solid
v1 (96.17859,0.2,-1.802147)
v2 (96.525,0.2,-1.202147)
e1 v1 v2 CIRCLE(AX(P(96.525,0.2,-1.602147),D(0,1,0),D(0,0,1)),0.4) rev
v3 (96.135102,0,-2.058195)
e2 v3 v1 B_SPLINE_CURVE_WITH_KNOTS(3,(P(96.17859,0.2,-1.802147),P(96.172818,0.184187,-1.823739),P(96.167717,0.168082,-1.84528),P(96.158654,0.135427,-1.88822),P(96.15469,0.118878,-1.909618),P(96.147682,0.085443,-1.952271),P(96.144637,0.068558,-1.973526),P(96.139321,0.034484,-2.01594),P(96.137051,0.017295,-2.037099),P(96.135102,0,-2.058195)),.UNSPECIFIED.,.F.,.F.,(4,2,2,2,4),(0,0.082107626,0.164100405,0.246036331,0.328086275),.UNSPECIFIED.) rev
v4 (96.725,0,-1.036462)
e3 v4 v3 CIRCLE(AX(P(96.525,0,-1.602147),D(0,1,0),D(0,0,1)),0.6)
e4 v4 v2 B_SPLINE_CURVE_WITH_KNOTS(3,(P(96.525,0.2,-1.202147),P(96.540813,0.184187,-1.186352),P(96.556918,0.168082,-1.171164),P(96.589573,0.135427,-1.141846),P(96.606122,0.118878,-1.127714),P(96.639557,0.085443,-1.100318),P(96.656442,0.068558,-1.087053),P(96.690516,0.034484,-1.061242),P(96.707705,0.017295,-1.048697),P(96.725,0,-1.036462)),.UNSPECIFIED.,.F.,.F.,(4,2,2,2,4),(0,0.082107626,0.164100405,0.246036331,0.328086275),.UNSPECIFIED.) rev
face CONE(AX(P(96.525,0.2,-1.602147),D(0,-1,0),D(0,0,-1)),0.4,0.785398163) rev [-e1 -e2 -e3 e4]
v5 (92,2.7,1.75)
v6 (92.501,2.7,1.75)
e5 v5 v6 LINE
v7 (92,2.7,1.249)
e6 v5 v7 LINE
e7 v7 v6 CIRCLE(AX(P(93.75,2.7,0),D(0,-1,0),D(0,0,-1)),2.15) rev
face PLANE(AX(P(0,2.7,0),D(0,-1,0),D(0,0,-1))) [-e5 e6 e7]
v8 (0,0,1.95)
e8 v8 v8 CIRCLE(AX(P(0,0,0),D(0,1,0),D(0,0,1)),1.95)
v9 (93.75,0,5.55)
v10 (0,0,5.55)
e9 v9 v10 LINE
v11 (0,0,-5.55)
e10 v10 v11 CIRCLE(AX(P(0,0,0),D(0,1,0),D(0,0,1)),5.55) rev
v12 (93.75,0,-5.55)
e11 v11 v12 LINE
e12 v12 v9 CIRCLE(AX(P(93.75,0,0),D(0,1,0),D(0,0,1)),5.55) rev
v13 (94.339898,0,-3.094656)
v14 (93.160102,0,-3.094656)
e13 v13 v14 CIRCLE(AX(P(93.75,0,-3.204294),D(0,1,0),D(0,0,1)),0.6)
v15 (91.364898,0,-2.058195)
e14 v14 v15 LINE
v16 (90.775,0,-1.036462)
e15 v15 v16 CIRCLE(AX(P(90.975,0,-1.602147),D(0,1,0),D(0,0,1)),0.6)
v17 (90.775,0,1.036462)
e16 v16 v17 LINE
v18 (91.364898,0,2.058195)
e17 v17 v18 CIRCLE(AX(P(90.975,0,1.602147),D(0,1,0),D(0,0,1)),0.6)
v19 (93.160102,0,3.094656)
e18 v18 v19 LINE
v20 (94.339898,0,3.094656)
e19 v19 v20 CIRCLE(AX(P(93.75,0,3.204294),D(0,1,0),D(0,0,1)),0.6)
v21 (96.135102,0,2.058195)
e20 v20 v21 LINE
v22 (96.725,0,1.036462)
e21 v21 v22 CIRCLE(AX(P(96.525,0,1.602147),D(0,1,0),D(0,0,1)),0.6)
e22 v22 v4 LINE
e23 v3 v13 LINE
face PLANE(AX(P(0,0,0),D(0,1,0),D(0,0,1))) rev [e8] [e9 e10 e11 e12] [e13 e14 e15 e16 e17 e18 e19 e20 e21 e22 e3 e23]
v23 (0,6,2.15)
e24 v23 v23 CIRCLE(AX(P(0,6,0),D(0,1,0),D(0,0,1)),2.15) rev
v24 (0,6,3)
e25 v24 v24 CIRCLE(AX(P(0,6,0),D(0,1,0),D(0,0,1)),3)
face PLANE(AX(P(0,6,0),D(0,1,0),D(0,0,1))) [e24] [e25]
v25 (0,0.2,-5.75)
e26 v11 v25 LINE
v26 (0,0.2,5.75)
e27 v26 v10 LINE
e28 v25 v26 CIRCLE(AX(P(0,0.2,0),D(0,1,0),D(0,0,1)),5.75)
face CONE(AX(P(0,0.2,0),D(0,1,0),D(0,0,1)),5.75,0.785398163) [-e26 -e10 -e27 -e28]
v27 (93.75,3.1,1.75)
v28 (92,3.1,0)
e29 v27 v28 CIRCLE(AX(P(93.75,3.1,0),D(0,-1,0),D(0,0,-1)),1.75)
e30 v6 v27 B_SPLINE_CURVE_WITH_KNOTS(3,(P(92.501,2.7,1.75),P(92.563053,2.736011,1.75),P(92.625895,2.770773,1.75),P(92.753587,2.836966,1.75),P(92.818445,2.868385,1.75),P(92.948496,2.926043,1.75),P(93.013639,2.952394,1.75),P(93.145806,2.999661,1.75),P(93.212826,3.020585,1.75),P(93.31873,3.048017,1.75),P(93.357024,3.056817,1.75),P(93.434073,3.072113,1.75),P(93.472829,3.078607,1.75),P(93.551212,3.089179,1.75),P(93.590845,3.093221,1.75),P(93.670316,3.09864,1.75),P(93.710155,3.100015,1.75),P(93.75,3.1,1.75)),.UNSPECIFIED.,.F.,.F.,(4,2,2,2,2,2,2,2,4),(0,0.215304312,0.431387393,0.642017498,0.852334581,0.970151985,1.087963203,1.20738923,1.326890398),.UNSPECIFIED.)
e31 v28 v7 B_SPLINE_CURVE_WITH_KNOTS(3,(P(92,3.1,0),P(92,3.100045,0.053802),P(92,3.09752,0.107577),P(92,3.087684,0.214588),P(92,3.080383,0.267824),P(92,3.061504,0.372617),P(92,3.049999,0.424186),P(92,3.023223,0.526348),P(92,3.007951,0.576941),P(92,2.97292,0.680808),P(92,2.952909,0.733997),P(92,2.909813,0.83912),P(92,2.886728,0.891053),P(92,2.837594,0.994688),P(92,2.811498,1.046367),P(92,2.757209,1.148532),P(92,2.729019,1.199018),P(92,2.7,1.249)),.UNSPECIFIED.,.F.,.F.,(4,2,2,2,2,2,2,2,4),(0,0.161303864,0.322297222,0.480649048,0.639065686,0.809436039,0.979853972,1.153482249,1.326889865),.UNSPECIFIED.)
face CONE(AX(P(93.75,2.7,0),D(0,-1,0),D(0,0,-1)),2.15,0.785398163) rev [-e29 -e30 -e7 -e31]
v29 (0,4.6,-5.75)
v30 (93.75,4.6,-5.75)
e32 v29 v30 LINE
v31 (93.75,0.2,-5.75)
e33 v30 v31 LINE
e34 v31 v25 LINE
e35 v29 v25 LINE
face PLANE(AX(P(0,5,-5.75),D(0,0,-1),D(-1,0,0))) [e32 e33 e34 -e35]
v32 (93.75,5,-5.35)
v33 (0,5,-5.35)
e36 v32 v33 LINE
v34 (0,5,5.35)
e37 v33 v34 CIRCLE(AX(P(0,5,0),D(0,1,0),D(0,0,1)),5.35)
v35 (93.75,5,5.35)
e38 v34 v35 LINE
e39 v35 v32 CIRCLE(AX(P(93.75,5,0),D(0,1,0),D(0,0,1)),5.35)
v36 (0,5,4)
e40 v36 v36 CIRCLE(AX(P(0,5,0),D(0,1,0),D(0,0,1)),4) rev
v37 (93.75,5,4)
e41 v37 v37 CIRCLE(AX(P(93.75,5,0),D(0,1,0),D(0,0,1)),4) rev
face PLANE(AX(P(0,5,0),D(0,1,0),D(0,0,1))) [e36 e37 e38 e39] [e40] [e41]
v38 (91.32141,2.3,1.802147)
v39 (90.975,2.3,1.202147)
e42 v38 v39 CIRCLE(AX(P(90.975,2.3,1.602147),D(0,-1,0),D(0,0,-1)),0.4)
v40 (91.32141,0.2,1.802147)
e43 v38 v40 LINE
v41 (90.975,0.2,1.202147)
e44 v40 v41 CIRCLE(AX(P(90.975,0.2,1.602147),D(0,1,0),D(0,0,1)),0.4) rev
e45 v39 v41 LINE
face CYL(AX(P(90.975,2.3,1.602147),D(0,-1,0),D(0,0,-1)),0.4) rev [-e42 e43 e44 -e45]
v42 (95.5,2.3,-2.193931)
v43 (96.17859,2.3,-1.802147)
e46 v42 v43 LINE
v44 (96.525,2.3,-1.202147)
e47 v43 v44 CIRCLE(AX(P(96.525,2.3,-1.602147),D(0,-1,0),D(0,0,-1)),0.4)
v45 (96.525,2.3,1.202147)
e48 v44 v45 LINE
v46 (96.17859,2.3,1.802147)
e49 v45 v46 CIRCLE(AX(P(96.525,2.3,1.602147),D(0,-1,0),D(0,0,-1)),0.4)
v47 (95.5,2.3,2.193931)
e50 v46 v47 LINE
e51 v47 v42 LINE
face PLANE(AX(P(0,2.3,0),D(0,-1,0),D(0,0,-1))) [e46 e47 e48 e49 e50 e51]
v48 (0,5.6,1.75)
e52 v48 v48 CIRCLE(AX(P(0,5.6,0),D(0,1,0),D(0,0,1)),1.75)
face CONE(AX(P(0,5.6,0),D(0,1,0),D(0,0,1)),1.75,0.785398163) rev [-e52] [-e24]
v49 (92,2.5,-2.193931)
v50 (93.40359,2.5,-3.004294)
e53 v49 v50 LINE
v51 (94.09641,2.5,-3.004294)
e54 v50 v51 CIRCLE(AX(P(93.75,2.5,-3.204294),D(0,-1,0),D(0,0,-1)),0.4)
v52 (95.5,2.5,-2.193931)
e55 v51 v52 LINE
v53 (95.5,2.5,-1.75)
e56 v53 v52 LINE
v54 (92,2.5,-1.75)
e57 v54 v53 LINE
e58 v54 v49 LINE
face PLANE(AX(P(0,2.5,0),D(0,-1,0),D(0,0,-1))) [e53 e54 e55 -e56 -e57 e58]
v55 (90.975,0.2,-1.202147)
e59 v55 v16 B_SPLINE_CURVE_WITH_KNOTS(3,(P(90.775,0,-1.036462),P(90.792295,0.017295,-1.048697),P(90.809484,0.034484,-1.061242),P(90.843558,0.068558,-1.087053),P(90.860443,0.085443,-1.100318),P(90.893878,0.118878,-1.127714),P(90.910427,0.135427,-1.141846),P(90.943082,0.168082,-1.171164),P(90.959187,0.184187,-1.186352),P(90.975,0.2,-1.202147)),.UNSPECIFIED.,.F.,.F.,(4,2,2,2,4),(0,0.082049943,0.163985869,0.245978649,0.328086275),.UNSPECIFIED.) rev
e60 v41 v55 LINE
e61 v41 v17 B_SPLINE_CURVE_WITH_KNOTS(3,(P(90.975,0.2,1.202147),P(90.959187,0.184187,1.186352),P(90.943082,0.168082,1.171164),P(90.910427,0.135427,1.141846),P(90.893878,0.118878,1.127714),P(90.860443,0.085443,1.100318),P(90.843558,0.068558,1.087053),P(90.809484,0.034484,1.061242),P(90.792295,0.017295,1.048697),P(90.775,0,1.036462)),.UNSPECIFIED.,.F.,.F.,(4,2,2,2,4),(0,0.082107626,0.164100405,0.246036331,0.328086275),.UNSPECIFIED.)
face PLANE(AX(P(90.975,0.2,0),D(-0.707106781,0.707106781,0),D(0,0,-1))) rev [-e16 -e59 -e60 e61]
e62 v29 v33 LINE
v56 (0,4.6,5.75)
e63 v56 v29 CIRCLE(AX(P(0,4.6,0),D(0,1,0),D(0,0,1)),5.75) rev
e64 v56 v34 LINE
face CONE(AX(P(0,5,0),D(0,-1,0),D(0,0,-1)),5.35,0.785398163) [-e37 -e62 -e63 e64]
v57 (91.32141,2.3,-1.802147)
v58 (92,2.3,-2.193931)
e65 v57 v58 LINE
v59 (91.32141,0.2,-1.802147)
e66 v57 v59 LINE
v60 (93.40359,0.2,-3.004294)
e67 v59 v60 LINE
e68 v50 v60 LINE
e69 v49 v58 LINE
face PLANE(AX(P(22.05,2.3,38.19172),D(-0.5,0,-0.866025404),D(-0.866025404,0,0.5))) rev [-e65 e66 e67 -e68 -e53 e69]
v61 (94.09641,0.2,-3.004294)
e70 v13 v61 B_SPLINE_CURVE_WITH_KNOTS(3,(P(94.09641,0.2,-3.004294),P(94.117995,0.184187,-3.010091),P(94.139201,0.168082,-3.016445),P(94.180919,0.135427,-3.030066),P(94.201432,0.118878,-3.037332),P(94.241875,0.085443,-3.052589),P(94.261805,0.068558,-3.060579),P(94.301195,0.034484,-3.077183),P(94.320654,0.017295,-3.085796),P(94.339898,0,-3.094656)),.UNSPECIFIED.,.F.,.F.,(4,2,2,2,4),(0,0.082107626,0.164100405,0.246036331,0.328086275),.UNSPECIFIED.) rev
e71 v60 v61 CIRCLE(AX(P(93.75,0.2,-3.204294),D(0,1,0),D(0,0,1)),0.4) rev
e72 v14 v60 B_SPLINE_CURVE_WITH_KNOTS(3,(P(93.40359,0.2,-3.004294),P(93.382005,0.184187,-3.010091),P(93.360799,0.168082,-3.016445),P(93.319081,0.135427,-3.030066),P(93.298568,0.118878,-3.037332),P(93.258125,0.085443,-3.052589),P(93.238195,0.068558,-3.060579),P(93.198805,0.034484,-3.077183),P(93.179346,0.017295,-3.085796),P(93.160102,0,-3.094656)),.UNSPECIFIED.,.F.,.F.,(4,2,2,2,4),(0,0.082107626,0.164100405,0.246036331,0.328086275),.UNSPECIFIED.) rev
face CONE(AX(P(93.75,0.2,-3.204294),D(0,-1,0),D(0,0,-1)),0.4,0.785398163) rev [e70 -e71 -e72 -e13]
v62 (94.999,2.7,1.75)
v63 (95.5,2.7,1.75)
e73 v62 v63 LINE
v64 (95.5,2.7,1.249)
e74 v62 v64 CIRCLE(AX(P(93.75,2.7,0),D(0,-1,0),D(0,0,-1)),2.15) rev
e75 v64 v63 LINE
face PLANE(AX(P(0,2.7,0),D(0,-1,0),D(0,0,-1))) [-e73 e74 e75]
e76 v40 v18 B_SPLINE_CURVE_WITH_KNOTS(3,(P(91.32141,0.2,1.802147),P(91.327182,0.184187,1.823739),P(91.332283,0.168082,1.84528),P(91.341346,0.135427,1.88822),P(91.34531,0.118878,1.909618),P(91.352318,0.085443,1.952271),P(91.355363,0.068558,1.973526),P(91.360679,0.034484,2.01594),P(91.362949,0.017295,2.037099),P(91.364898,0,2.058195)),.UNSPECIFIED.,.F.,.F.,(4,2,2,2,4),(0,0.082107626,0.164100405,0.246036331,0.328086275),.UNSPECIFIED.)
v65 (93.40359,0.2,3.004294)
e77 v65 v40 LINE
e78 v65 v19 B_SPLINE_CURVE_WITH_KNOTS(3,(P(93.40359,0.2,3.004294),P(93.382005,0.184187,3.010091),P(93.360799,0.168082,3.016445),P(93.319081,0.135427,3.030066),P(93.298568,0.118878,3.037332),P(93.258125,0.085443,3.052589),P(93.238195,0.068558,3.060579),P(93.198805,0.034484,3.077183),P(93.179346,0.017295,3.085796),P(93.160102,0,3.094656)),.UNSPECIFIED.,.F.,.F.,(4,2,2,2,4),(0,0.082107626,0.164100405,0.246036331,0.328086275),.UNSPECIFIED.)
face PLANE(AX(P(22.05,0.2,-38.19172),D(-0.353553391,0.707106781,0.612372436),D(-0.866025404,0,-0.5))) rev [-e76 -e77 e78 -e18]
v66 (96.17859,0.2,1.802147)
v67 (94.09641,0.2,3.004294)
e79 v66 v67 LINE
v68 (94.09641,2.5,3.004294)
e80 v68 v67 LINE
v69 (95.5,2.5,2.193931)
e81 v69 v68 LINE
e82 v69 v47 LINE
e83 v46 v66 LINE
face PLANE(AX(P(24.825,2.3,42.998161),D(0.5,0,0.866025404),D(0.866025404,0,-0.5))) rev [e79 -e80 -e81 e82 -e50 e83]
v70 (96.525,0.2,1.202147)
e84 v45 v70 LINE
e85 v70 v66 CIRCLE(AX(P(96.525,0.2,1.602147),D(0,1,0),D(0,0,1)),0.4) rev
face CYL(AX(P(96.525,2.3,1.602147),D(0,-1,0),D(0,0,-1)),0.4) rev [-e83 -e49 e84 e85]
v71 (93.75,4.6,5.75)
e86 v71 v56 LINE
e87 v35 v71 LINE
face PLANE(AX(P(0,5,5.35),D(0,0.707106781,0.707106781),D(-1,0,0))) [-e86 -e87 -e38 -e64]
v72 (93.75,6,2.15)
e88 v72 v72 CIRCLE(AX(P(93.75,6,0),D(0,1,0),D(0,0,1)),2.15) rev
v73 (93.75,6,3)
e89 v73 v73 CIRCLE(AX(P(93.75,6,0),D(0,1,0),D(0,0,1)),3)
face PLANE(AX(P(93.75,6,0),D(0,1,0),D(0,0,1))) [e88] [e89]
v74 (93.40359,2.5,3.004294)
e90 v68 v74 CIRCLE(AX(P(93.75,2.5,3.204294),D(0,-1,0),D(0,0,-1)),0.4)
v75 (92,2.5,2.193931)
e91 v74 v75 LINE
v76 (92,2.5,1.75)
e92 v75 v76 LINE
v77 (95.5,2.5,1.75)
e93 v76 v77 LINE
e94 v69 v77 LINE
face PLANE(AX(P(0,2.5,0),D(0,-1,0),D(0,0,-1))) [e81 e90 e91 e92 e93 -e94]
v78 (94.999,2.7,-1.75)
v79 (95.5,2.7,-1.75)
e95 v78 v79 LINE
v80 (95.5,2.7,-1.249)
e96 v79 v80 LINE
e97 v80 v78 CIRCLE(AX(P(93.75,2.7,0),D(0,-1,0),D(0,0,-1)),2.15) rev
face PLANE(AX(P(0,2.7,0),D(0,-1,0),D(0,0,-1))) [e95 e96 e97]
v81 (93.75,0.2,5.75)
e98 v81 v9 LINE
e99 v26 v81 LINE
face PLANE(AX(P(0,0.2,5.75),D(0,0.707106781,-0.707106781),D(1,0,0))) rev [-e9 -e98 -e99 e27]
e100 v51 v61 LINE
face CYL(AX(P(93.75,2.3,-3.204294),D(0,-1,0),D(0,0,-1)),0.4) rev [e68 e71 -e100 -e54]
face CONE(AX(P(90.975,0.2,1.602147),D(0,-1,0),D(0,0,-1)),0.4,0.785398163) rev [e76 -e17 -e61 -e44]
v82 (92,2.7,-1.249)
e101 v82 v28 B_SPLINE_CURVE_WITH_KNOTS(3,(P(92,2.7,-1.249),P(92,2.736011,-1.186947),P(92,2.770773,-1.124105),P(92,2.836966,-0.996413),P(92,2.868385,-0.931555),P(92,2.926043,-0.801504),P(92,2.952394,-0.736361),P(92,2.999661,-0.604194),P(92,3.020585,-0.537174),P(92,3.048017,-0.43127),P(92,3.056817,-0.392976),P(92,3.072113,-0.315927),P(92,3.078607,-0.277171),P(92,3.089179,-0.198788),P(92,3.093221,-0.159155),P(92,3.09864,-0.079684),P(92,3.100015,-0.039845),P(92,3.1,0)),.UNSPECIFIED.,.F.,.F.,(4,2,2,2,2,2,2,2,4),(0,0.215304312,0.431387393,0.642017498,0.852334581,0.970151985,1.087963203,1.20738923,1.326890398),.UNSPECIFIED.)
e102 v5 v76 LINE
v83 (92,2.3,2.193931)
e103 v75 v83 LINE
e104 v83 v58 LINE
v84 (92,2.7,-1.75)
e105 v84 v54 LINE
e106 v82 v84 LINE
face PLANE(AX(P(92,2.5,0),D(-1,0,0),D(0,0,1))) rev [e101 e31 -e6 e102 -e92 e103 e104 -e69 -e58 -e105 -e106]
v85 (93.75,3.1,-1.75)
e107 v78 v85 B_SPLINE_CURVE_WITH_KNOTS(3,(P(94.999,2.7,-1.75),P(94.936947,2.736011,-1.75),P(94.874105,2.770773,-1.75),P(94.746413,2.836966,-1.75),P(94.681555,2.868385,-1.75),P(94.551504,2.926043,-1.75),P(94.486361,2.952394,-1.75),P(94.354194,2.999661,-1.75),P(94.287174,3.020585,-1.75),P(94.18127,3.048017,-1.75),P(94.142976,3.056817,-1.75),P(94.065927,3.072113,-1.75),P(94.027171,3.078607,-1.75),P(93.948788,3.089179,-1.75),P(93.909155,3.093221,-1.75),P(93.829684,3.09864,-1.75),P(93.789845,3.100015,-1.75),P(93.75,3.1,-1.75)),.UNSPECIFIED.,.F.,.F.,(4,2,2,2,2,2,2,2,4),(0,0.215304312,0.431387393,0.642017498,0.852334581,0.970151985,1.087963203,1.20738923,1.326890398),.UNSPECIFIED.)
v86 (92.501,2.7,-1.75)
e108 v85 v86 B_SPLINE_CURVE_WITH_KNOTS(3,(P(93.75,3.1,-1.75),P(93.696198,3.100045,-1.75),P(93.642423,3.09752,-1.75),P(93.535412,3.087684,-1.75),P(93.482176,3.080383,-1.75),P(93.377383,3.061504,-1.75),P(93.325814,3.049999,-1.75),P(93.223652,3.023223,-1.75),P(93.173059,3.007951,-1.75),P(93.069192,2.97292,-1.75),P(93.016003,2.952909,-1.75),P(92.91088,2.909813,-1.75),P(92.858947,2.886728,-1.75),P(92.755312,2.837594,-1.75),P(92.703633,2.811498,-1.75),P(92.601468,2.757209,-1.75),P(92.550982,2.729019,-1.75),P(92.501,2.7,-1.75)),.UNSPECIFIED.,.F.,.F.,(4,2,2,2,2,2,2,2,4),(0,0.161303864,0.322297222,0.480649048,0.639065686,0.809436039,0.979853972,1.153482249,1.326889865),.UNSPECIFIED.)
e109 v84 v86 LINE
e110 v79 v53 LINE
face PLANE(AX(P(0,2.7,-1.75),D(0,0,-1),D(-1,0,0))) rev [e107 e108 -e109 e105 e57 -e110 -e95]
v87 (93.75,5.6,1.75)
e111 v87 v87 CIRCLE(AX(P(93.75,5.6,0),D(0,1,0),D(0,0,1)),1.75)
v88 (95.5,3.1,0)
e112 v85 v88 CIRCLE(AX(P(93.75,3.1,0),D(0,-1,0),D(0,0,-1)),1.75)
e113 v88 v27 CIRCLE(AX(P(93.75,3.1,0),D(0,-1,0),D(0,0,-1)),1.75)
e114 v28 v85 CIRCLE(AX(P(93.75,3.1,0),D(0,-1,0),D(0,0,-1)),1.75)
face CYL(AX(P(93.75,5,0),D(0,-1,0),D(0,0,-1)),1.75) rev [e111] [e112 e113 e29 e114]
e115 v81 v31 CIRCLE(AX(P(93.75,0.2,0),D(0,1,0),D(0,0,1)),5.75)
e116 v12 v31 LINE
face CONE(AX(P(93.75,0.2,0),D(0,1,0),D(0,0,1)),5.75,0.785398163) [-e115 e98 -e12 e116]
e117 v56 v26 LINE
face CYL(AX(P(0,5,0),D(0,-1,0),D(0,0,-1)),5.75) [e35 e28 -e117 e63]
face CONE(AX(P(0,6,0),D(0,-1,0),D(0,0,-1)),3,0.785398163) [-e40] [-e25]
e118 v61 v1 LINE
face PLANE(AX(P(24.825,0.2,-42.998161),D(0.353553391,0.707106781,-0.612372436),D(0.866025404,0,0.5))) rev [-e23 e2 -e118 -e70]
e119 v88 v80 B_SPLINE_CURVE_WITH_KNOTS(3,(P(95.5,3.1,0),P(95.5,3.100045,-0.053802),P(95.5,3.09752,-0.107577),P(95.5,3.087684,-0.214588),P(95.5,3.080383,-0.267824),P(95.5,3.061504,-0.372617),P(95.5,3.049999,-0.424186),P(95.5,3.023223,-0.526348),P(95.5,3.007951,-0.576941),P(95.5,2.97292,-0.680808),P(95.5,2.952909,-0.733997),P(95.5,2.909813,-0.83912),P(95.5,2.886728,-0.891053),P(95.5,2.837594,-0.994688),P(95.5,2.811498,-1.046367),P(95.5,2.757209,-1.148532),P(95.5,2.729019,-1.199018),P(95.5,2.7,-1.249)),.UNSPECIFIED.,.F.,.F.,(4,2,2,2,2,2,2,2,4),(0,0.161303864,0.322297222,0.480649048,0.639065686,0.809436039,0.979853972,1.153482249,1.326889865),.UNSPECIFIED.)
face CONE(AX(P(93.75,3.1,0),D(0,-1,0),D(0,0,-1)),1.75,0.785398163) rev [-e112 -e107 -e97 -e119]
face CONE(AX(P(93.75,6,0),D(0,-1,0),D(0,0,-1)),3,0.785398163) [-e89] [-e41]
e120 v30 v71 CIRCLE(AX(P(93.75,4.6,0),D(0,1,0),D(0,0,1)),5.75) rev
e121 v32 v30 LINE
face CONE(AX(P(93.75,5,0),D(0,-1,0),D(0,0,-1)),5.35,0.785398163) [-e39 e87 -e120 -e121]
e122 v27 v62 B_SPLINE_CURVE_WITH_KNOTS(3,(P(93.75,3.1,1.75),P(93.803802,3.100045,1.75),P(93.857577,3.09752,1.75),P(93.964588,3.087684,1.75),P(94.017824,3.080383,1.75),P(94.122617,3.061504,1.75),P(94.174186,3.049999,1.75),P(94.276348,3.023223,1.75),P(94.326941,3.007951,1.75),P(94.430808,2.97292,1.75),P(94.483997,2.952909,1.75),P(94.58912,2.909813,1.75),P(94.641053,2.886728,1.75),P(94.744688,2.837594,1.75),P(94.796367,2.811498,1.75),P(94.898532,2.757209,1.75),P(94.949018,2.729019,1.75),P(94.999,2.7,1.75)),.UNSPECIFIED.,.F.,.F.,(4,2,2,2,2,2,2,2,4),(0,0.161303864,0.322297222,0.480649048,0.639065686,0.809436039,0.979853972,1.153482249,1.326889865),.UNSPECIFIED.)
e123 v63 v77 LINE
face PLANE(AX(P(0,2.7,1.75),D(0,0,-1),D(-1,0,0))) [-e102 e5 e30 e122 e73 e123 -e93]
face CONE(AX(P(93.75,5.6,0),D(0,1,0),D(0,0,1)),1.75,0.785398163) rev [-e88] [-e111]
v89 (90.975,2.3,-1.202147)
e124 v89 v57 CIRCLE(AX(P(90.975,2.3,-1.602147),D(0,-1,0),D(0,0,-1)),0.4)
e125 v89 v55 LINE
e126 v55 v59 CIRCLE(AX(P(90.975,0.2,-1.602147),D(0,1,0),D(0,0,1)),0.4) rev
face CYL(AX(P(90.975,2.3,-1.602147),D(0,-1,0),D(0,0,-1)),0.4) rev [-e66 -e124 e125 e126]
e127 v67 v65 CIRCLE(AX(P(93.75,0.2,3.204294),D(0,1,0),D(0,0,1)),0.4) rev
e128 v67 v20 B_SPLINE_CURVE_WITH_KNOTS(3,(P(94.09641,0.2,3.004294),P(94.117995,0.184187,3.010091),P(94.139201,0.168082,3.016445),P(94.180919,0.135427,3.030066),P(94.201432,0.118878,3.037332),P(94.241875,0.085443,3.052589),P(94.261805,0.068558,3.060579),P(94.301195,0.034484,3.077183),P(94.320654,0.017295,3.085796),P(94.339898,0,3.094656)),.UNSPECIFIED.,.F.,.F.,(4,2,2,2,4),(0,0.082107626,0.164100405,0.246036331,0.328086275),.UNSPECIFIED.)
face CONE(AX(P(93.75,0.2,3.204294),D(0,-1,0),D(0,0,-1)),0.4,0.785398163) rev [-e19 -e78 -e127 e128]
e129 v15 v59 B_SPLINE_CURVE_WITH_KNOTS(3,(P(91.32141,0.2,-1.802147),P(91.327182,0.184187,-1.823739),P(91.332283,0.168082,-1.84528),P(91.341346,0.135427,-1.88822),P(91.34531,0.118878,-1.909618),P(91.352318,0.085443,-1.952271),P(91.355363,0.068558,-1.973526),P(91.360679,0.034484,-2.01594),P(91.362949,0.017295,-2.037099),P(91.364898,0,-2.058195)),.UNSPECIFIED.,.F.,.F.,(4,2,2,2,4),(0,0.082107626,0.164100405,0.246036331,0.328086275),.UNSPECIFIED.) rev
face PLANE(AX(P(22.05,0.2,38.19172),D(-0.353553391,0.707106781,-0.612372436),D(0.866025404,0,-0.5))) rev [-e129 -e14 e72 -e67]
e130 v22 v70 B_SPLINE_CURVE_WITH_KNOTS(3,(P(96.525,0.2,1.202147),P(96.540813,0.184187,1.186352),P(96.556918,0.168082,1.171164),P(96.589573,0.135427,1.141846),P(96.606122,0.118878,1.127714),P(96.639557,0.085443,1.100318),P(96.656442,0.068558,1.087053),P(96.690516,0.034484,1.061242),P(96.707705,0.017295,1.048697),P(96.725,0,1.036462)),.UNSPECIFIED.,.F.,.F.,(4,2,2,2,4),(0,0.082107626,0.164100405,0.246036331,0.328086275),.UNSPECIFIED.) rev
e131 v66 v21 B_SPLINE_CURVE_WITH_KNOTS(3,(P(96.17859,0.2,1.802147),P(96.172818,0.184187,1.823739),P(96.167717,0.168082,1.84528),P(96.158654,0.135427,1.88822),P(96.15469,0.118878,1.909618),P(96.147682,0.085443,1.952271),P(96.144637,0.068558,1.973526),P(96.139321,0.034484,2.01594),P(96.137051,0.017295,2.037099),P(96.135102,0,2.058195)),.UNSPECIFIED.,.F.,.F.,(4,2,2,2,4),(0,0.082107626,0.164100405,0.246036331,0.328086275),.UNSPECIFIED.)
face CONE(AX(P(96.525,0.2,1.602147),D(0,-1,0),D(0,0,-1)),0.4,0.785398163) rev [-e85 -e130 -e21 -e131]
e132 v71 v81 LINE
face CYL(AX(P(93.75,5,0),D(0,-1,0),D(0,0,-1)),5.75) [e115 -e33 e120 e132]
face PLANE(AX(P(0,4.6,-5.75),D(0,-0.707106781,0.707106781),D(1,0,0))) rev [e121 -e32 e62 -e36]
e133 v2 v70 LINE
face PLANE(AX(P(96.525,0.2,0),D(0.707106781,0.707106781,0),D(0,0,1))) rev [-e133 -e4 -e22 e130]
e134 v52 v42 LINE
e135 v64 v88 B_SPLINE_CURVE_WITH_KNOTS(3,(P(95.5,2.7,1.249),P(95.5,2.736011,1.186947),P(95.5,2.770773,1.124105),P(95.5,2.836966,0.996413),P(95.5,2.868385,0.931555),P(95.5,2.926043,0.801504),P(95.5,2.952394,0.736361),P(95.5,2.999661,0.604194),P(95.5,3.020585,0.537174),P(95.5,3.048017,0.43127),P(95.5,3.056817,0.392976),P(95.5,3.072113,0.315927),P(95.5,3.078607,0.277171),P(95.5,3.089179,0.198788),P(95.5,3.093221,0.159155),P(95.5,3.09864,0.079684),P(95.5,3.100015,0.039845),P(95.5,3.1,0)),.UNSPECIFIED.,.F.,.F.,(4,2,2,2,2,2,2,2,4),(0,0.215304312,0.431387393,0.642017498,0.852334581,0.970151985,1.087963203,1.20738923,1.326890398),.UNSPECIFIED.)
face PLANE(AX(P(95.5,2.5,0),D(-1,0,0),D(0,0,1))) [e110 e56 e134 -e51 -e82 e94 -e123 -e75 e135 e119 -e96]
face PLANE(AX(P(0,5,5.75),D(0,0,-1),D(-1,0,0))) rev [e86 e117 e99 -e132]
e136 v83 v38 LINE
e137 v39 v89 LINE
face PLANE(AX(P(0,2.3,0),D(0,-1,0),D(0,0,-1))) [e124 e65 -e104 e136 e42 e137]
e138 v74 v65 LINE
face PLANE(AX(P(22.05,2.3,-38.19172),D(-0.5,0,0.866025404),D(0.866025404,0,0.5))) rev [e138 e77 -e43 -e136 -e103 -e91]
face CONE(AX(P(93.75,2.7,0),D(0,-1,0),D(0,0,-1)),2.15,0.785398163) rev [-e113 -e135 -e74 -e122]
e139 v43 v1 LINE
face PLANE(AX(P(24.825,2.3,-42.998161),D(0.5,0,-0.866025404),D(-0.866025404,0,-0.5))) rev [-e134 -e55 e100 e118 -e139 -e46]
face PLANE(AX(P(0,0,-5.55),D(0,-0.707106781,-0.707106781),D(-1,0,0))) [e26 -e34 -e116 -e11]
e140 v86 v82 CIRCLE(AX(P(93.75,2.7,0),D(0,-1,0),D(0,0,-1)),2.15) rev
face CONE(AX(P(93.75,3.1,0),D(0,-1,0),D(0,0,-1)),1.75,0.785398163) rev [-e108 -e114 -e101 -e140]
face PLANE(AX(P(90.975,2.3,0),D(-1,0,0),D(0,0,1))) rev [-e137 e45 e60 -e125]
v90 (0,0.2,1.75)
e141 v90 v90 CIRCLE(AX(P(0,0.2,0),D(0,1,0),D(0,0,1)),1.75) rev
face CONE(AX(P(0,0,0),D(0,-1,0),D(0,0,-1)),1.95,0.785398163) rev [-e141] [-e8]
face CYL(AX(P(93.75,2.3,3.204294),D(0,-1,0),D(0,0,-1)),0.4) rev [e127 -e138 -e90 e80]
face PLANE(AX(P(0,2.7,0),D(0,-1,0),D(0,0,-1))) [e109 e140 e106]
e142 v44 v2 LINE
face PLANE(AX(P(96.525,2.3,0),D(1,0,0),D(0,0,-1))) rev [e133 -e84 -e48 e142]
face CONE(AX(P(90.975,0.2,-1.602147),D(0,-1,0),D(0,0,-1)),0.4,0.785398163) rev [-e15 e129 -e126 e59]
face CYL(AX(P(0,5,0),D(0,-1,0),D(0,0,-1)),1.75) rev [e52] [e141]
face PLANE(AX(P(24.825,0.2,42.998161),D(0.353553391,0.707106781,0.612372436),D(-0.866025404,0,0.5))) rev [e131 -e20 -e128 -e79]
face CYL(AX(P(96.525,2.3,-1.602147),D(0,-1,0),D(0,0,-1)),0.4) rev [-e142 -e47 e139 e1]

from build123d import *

# Parameters (mm, degrees)
CROQUIS2_R              = 1.75
SALIENTE_EXTRUIR1_DEPTH = 5
CROQUIS3_R              = 3
CROQUIS3_R_2            = 1.75
SALIENTE_EXTRUIR2_DEPTH = 1
CHAFL_N1_SIZE           = 1
CHAFL_N2_SIZE           = 0.4
CROQUIS4_R              = 0.4
CROQUIS4_R_2            = 1.75
CORTAR_EXTRUIR1_DEPTH   = 2.3
CHAFL_N3_SIZE           = 0.2
CORTAR_EXTRUIR2_DEPTH   = 0.2
CORTAR_EXTRUIR3_DEPTH   = 0.2
CHAFL_N4_SIZE           = 0.4


# Some blends are built 0.0001 mm under size
with BuildPart() as part:
    # Croquis2 → Saliente-Extruir1 (new body)
    with BuildSketch(Plane(origin=(0, 0, 0), x_dir=(1, 0, 0), z_dir=(0, 1, 0))):
        with BuildLine():
            Line((0, 5.75), (93.75, 5.75))
            ThreePointArc((93.75, 5.75), (99.5, 0), (93.75, -5.75))
            Line((93.75, -5.75), (0, -5.75))
            ThreePointArc((0, -5.75), (-5.75, 0), (0, 5.75))
        make_face()
        with Locations(Location((93.75, 0, 0), (0, 0, 270))):
            Circle(CROQUIS2_R, mode=Mode.SUBTRACT)
        with Locations(Location((0, 0, 0), (0, 0, 270))):
            Circle(CROQUIS2_R, mode=Mode.SUBTRACT)
    extrude(amount=SALIENTE_EXTRUIR1_DEPTH)

    # Croquis3 → Saliente-Extruir2 (add)
    # profile 1 of 2: a face of its own
    with BuildSketch(Plane(origin=(0, 5, 0), x_dir=(1, 0, 0), z_dir=(0, 1, 0))):
        with Locations(Location((93.75, 0, 0), (0, 0, 270))):
            Circle(CROQUIS3_R)
        with Locations(Location((93.75, 0, 0), (0, 0, 270))):
            Circle(CROQUIS3_R_2, mode=Mode.SUBTRACT)
    # profile 2 of 2: a face of its own
    with BuildSketch(Plane(origin=(0, 5, 0), x_dir=(1, 0, 0), z_dir=(0, 1, 0))):
        with Locations(Location((0, 0, 0), (0, 0, 270))):
            Circle(CROQUIS3_R)
        with Locations(Location((0, 0, 0), (0, 0, 270))):
            Circle(CROQUIS3_R_2, mode=Mode.SUBTRACT)
    extrude(amount=SALIENTE_EXTRUIR2_DEPTH)

    # Chaflán1
    chafl_n1_edges = [part.edges().sort_by_distance(p)[0] for p in [
        (93.75, 5, -3),
        (0, 5, -3),
    ]]
    chamfer(chafl_n1_edges, length=CHAFL_N1_SIZE - 0.0001)  # a hair under: the kernel refuses the full size

    # Chaflán2
    chafl_n2_edges = [part.edges().sort_by_distance(p)[0] for p in [
        (46.875, 5, 5.75),
        (99.5, 5, 0),
        (93.75, 6, -1.75),
        (46.875, 5, -5.75),
        (0, 6, -1.75),
        (-5.75, 5, 0),
    ]]
    chamfer(chafl_n2_edges, length=CHAFL_N2_SIZE)

    # Croquis4 → Cortar-Extruir1 (cut)
    # profile 1 of 31: a face of its own
    with BuildSketch(Plane.XZ):
        with Locations((90.975, 1.602146997)):
            Circle(CROQUIS4_R)
    # profile 2 of 31: a face of its own
    with BuildSketch(Plane.XZ):
        with Locations((90.975, -1.602146997)):
            Circle(CROQUIS4_R)
    # profile 3 of 31: a face of its own
    with BuildSketch(Plane.XZ):
        with Locations((93.75, -3.204293994)):
            Circle(CROQUIS4_R)
    # profile 4 of 31: a face of its own
    with BuildSketch(Plane.XZ):
        with Locations((96.525, -1.602146997)):
            Circle(CROQUIS4_R)
    # profile 5 of 31: a face of its own
    with BuildSketch(Plane.XZ):
        with Locations((96.525, 1.602146997)):
            Circle(CROQUIS4_R)
    # profile 6 of 31: a face of its own
    with BuildSketch(Plane.XZ):
        with Locations((93.75, 3.204293994)):
            Circle(CROQUIS4_R)
    # profile 7 of 31: a face of its own
    with BuildSketch(Plane.XZ):
        Polygon((90.975, 1.602146997), (90.975, -1.602146997), (93.75, -3.204293994), (96.525, -1.602146997), (96.525, 1.602146997), (93.75, 3.204293994), align=None)
        with Locations(Location((93.75, 0, 0), (0, 0, 270))):
            Circle(CROQUIS4_R_2, mode=Mode.SUBTRACT)
    # profile 8 of 31: a face of its own
    with BuildSketch(Plane.XZ):
        with BuildLine():
            Line((94.096410162, 3.004293994), (93.75, 3.204293994))
            Line((93.75, 3.204293994), (93.403589838, 3.004293994))
            ThreePointArc((93.403589838, 3.004293994), (93.75, 2.804293994), (94.096410162, 3.004293994))
        make_face()
    # profile 9 of 31: a face of its own
    with BuildSketch(Plane.XZ):
        with BuildLine():
            Line((93.403589838, 3.004293994), (93.75, 3.204293994))
            Line((93.75, 3.204293994), (94.096410162, 3.004293994))
            ThreePointArc((94.096410162, 3.004293994), (94.136370331, 3.100766376), (94.15, 3.204293994))
            ThreePointArc((94.15, 3.204293994), (93.646472382, 3.590664325), (93.403589838, 3.004293994))
        make_face()
    # profile 10 of 31: a face of its own
    with BuildSketch(Plane.XZ):
        with BuildLine():
            Line((94.096410162, 3.004293994), (93.75, 3.204293994))
            Line((93.75, 3.204293994), (93.403589838, 3.004293994))
            ThreePointArc((93.403589838, 3.004293994), (93.75, 2.804293994), (94.096410162, 3.004293994))
        make_face()
    # profile 11 of 31: a face of its own
    with BuildSketch(Plane.XZ):
        with BuildLine():
            Line((93.403589838, 3.004293994), (93.75, 3.204293994))
            Line((93.75, 3.204293994), (94.096410162, 3.004293994))
            ThreePointArc((94.096410162, 3.004293994), (94.136370331, 3.100766376), (94.15, 3.204293994))
            ThreePointArc((94.15, 3.204293994), (93.646472382, 3.590664325), (93.403589838, 3.004293994))
        make_face()
    # profile 12 of 31: a face of its own
    with BuildSketch(Plane.XZ):
        with BuildLine():
            ThreePointArc((96.925, 1.602146997), (96.628527618, 1.988517328), (96.178589838, 1.802146997))
            Line((96.178589838, 1.802146997), (96.525, 1.602146997))
            Line((96.525, 1.602146997), (96.525, 1.202146997))
            ThreePointArc((96.525, 1.202146997), (96.807842712, 1.319304285), (96.925, 1.602146997))
        make_face()
    # profile 13 of 31: a face of its own
    with BuildSketch(Plane.XZ):
        with BuildLine():
            Line((96.525, 1.602146997), (96.178589838, 1.802146997))
            ThreePointArc((96.178589838, 1.802146997), (96.178589838, 1.402146997), (96.525, 1.202146997))
            Line((96.525, 1.202146997), (96.525, 1.602146997))
        make_face()
    # profile 14 of 31: a face of its own
    with BuildSketch(Plane.XZ):
        with BuildLine():
            ThreePointArc((96.925, 1.602146997), (96.628527618, 1.988517328), (96.178589838, 1.802146997))
            Line((96.178589838, 1.802146997), (96.525, 1.602146997))
            Line((96.525, 1.602146997), (96.525, 1.202146997))
            ThreePointArc((96.525, 1.202146997), (96.807842712, 1.319304285), (96.925, 1.602146997))
        make_face()
    # profile 15 of 31: a face of its own
    with BuildSketch(Plane.XZ):
        with BuildLine():
            Line((96.525, 1.602146997), (96.178589838, 1.802146997))
            ThreePointArc((96.178589838, 1.802146997), (96.178589838, 1.402146997), (96.525, 1.202146997))
            Line((96.525, 1.202146997), (96.525, 1.602146997))
        make_face()
    # profile 16 of 31: a face of its own
    with BuildSketch(Plane.XZ):
        with BuildLine():
            ThreePointArc((96.925, -1.602146997), (96.807842712, -1.319304285), (96.525, -1.202146997))
            Line((96.525, -1.202146997), (96.525, -1.602146997))
            Line((96.525, -1.602146997), (96.178589838, -1.802146997))
            ThreePointArc((96.178589838, -1.802146997), (96.628527618, -1.988517328), (96.925, -1.602146997))
        make_face()
    # profile 17 of 31: a face of its own
    with BuildSketch(Plane.XZ):
        with BuildLine():
            Line((96.525, -1.602146997), (96.525, -1.202146997))
            ThreePointArc((96.525, -1.202146997), (96.178589838, -1.402146997), (96.178589838, -1.802146997))
            Line((96.178589838, -1.802146997), (96.525, -1.602146997))
        make_face()
    # profile 18 of 31: a face of its own
    with BuildSketch(Plane.XZ):
        with BuildLine():
            ThreePointArc((96.925, -1.602146997), (96.807842712, -1.319304285), (96.525, -1.202146997))
            Line((96.525, -1.202146997), (96.525, -1.602146997))
            Line((96.525, -1.602146997), (96.178589838, -1.802146997))
            ThreePointArc((96.178589838, -1.802146997), (96.628527618, -1.988517328), (96.925, -1.602146997))
        make_face()
    # profile 19 of 31: a face of its own
    with BuildSketch(Plane.XZ):
        with BuildLine():
            Line((96.525, -1.602146997), (96.525, -1.202146997))
            ThreePointArc((96.525, -1.202146997), (96.178589838, -1.402146997), (96.178589838, -1.802146997))
            Line((96.178589838, -1.802146997), (96.525, -1.602146997))
        make_face()
    # profile 20 of 31: a face of its own
    with BuildSketch(Plane.XZ):
        with BuildLine():
            ThreePointArc((94.096410162, -3.004293994), (93.75, -2.804293994), (93.403589838, -3.004293994))
            Line((93.403589838, -3.004293994), (93.75, -3.204293994))
            Line((93.75, -3.204293994), (94.096410162, -3.004293994))
        make_face()
    # profile 21 of 31: a face of its own
    with BuildSketch(Plane.XZ):
        with BuildLine():
            Line((93.75, -3.204293994), (93.403589838, -3.004293994))
            ThreePointArc((93.403589838, -3.004293994), (93.646472382, -3.590664325), (94.15, -3.204293994))
            ThreePointArc((94.15, -3.204293994), (94.136370331, -3.100766376), (94.096410162, -3.004293994))
            Line((94.096410162, -3.004293994), (93.75, -3.204293994))
        make_face()
    # profile 22 of 31: a face of its own
    with BuildSketch(Plane.XZ):
        with BuildLine():
            ThreePointArc((94.096410162, -3.004293994), (93.75, -2.804293994), (93.403589838, -3.004293994))
            Line((93.403589838, -3.004293994), (93.75, -3.204293994))
            Line((93.75, -3.204293994), (94.096410162, -3.004293994))
        make_face()
    # profile 23 of 31: a face of its own
    with BuildSketch(Plane.XZ):
        with BuildLine():
            Line((93.75, -3.204293994), (93.403589838, -3.004293994))
            ThreePointArc((93.403589838, -3.004293994), (93.646472382, -3.590664325), (94.15, -3.204293994))
            ThreePointArc((94.15, -3.204293994), (94.136370331, -3.100766376), (94.096410162, -3.004293994))
            Line((94.096410162, -3.004293994), (93.75, -3.204293994))
        make_face()
    # profile 24 of 31: a face of its own
    with BuildSketch(Plane.XZ):
        with BuildLine():
            ThreePointArc((91.375, -1.602146997), (91.257842712, -1.319304285), (90.975, -1.202146997))
            Line((90.975, -1.202146997), (90.975, -1.602146997))
            Line((90.975, -1.602146997), (91.321410162, -1.802146997))
            ThreePointArc((91.321410162, -1.802146997), (91.361370331, -1.705674615), (91.375, -1.602146997))
        make_face()
    # profile 25 of 31: a face of its own
    with BuildSketch(Plane.XZ):
        with BuildLine():
            Line((90.975, -1.602146997), (90.975, -1.202146997))
            ThreePointArc((90.975, -1.202146997), (90.628589838, -1.802146997), (91.321410162, -1.802146997))
            Line((91.321410162, -1.802146997), (90.975, -1.602146997))
        make_face()
    # profile 26 of 31: a face of its own
    with BuildSketch(Plane.XZ):
        with BuildLine():
            ThreePointArc((91.375, -1.602146997), (91.257842712, -1.319304285), (90.975, -1.202146997))
            Line((90.975, -1.202146997), (90.975, -1.602146997))
            Line((90.975, -1.602146997), (91.321410162, -1.802146997))
            ThreePointArc((91.321410162, -1.802146997), (91.361370331, -1.705674615), (91.375, -1.602146997))
        make_face()
    # profile 27 of 31: a face of its own
    with BuildSketch(Plane.XZ):
        with BuildLine():
            Line((90.975, -1.602146997), (90.975, -1.202146997))
            ThreePointArc((90.975, -1.202146997), (90.628589838, -1.802146997), (91.321410162, -1.802146997))
            Line((91.321410162, -1.802146997), (90.975, -1.602146997))
        make_face()
    # profile 28 of 31: a face of its own
    with BuildSketch(Plane.XZ):
        with BuildLine():
            ThreePointArc((91.375, 1.602146997), (91.361370331, 1.705674615), (91.321410162, 1.802146997))
            Line((91.321410162, 1.802146997), (90.975, 1.602146997))
            Line((90.975, 1.602146997), (90.975, 1.202146997))
            ThreePointArc((90.975, 1.202146997), (91.257842712, 1.319304285), (91.375, 1.602146997))
        make_face()
    # profile 29 of 31: a face of its own
    with BuildSketch(Plane.XZ):
        with BuildLine():
            Line((90.975, 1.602146997), (91.321410162, 1.802146997))
            ThreePointArc((91.321410162, 1.802146997), (90.628589838, 1.802146997), (90.975, 1.202146997))
            Line((90.975, 1.202146997), (90.975, 1.602146997))
        make_face()
    # profile 30 of 31: a face of its own
    with BuildSketch(Plane.XZ):
        with BuildLine():
            ThreePointArc((91.375, 1.602146997), (91.361370331, 1.705674615), (91.321410162, 1.802146997))
            Line((91.321410162, 1.802146997), (90.975, 1.602146997))
            Line((90.975, 1.602146997), (90.975, 1.202146997))
            ThreePointArc((90.975, 1.202146997), (91.257842712, 1.319304285), (91.375, 1.602146997))
        make_face()
    # profile 31 of 31: a face of its own
    with BuildSketch(Plane.XZ):
        with BuildLine():
            Line((90.975, 1.602146997), (91.321410162, 1.802146997))
            ThreePointArc((91.321410162, 1.802146997), (90.628589838, 1.802146997), (90.975, 1.202146997))
            Line((90.975, 1.202146997), (90.975, 1.602146997))
        make_face()
    extrude(amount=-CORTAR_EXTRUIR1_DEPTH, mode=Mode.SUBTRACT)

    # Chaflán3
    chafl_n3_edges = [part.edges().sort_by_distance(p)[0] for p in [
        (0, 0, -1.75),
        (90.628589838, 0, 1.802146997),
        (90.975, 0, 0),
        (90.628589838, 0, -1.802146997),
        (92.3625, 0, -2.403220496),
        (93.75, 0, -3.604293994),
        (95.1375, 0, -2.403220496),
        (96.871410162, 0, -1.802146997),
        (96.525, 0, 0),
        (96.871410162, 0, 1.802146997),
        (95.1375, 0, 2.403220496),
        (93.75, 0, 3.604293994),
        (92.3625, 0, 2.403220496),
        (-5.75, 0, 0),
        (46.875, 0, -5.75),
        (99.5, 0, 0),
        (46.875, 0, 5.75),
    ]]
    chamfer(chafl_n3_edges, length=CHAFL_N3_SIZE)

    # Croquis5 → Cortar-Extruir2 (cut)
    with BuildSketch(Plane.XZ.offset(-2.3)):
        with BuildLine():
            Line((93.403589838, 3.004293994), (92, 2.193931023))
            Line((92, 2.193931023), (92, 0))
            ThreePointArc((92, 0), (93.75, 1.75), (95.5, 0))
            Line((95.5, 0), (95.5, 2.193931023))
            Line((95.5, 2.193931023), (94.096410162, 3.004293994))
            ThreePointArc((94.096410162, 3.004293994), (93.75, 3.604293994), (93.403589838, 3.004293994))
        make_face()
        with BuildLine():
            ThreePointArc((95.5, 0), (93.75, -1.75), (92, 0))
            Line((92, 0), (92, -2.193931023))
            Line((92, -2.193931023), (93.403589838, -3.004293994))
            ThreePointArc((93.403589838, -3.004293994), (93.75, -3.604293994), (94.096410162, -3.004293994))
            Line((94.096410162, -3.004293994), (95.5, -2.193931023))
            Line((95.5, -2.193931023), (95.5, 0))
        make_face()
    extrude(amount=-CORTAR_EXTRUIR2_DEPTH, mode=Mode.SUBTRACT)

    # Croquis6 → Cortar-Extruir3 (cut)
    with BuildSketch(Plane.XZ.offset(-2.5)):
        with BuildLine():
            Line((93.75, 1.75), (92, 1.75))
            Line((92, 1.75), (92, 0))
            ThreePointArc((92, 0), (92.512563133, 1.237436867), (93.75, 1.75))
        make_face()
        with BuildLine():
            Line((95.5, 1.75), (93.75, 1.75))
            ThreePointArc((93.75, 1.75), (94.987436867, 1.237436867), (95.5, 0))
            Line((95.5, 0), (95.5, 1.75))
        make_face()
        with BuildLine():
            Line((95.5, -1.75), (95.5, 0))
            ThreePointArc((95.5, 0), (94.987436866, -1.237436868), (93.749999997, -1.75))
            Line((93.749999997, -1.75), (95.5, -1.75))
        make_face()
        with BuildLine():
            ThreePointArc((93.749999997, -1.75), (92.512563132, -1.237436866), (92, 0))
            Line((92, 0), (92, -1.75))
            Line((92, -1.75), (93.749999997, -1.75))
        make_face()
    extrude(amount=-CORTAR_EXTRUIR3_DEPTH, mode=Mode.SUBTRACT)

    # Chaflán4
    # the kernel refuses this chamfer: 0.4 mm, written as the material it takes off along each edge
    with BuildSketch(Plane(origin=(93.75, 2.7, 0), x_dir=(1, 0, 0), z_dir=(0, 0, 1))) as chafl_n4_piece_1_section:
        Polygon((1.75, CHAFL_N4_SIZE), (1.75 + CHAFL_N4_SIZE, 0), (1.75, 0), align=None)
    chafl_n4_piece_1 = revolve(axis=Axis((93.75, 2.7, 0), (0, 1, 0)), revolution_arc=90.000000086, mode=Mode.PRIVATE)
    chafl_n4_piece_1 = split(chafl_n4_piece_1, bisect_by=Plane(origin=(95.5, 2.845713539, -1.262575897), z_dir=(-1, 0, 0)), keep=Keep.TOP, mode=Mode.PRIVATE)
    chafl_n4_piece_1 = split(chafl_n4_piece_1, bisect_by=Plane(origin=(95.012575897, 2.845713539, -1.75), z_dir=(0, 0, 1)), keep=Keep.TOP, mode=Mode.PRIVATE)
    add(chafl_n4_piece_1, mode=Mode.SUBTRACT)
    with BuildSketch(Plane(origin=(93.75, 2.7, 0), x_dir=(-1, 0, 0), z_dir=(0, 0, -1))) as chafl_n4_piece_2_section:
        Polygon((1.75, CHAFL_N4_SIZE), (1.75 + CHAFL_N4_SIZE, 0), (1.75, 0), align=None)
    chafl_n4_piece_2 = revolve(axis=Axis((93.75, 2.7, 0), (0, 1, 0)), revolution_arc=90, mode=Mode.PRIVATE)
    chafl_n4_piece_2 = split(chafl_n4_piece_2, bisect_by=Plane(origin=(92, 2.845713539, 1.262575897), z_dir=(1, 0, 0)), keep=Keep.TOP, mode=Mode.PRIVATE)
    chafl_n4_piece_2 = split(chafl_n4_piece_2, bisect_by=Plane(origin=(92.487424103, 2.845713539, 1.75), z_dir=(0, 0, -1)), keep=Keep.TOP, mode=Mode.PRIVATE)
    add(chafl_n4_piece_2, mode=Mode.SUBTRACT)
    with BuildSketch(Plane(origin=(93.75, 2.7, 0), x_dir=(0, 0, 1), z_dir=(-1, 0, 0))) as chafl_n4_piece_3_section:
        Polygon((1.75, CHAFL_N4_SIZE), (1.75 + CHAFL_N4_SIZE, 0), (1.75, 0), align=None)
    chafl_n4_piece_3 = revolve(axis=Axis((93.75, 2.7, 0), (0, 1, 0)), revolution_arc=90, mode=Mode.PRIVATE)
    chafl_n4_piece_3 = split(chafl_n4_piece_3, bisect_by=Plane(origin=(95.5, 2.845713539, 1.262575897), z_dir=(-1, 0, 0)), keep=Keep.TOP, mode=Mode.PRIVATE)
    chafl_n4_piece_3 = split(chafl_n4_piece_3, bisect_by=Plane(origin=(95.012575897, 2.845713539, 1.75), z_dir=(0, 0, -1)), keep=Keep.TOP, mode=Mode.PRIVATE)
    add(chafl_n4_piece_3, mode=Mode.SUBTRACT)
    with BuildSketch(Plane(origin=(93.75, 2.7, 0), x_dir=(-1.5058390090416618e-09, 0, -1.0), z_dir=(1.0, 0, -1.5058390090416618e-09))) as chafl_n4_piece_4_section:
        Polygon((1.75, CHAFL_N4_SIZE), (1.75 + CHAFL_N4_SIZE, 0), (1.75, 0), align=None)
    chafl_n4_piece_4 = revolve(axis=Axis((93.75, 2.7, 0), (0, 1, 0)), revolution_arc=89.999999914, mode=Mode.PRIVATE)
    chafl_n4_piece_4 = split(chafl_n4_piece_4, bisect_by=Plane(origin=(92, 2.845713539, -1.262575897), z_dir=(1, 0, 0)), keep=Keep.TOP, mode=Mode.PRIVATE)
    chafl_n4_piece_4 = split(chafl_n4_piece_4, bisect_by=Plane(origin=(92.487424103, 2.845713539, -1.75), z_dir=(0, 0, 1)), keep=Keep.TOP, mode=Mode.PRIVATE)
    add(chafl_n4_piece_4, mode=Mode.SUBTRACT)


solid = part.part
